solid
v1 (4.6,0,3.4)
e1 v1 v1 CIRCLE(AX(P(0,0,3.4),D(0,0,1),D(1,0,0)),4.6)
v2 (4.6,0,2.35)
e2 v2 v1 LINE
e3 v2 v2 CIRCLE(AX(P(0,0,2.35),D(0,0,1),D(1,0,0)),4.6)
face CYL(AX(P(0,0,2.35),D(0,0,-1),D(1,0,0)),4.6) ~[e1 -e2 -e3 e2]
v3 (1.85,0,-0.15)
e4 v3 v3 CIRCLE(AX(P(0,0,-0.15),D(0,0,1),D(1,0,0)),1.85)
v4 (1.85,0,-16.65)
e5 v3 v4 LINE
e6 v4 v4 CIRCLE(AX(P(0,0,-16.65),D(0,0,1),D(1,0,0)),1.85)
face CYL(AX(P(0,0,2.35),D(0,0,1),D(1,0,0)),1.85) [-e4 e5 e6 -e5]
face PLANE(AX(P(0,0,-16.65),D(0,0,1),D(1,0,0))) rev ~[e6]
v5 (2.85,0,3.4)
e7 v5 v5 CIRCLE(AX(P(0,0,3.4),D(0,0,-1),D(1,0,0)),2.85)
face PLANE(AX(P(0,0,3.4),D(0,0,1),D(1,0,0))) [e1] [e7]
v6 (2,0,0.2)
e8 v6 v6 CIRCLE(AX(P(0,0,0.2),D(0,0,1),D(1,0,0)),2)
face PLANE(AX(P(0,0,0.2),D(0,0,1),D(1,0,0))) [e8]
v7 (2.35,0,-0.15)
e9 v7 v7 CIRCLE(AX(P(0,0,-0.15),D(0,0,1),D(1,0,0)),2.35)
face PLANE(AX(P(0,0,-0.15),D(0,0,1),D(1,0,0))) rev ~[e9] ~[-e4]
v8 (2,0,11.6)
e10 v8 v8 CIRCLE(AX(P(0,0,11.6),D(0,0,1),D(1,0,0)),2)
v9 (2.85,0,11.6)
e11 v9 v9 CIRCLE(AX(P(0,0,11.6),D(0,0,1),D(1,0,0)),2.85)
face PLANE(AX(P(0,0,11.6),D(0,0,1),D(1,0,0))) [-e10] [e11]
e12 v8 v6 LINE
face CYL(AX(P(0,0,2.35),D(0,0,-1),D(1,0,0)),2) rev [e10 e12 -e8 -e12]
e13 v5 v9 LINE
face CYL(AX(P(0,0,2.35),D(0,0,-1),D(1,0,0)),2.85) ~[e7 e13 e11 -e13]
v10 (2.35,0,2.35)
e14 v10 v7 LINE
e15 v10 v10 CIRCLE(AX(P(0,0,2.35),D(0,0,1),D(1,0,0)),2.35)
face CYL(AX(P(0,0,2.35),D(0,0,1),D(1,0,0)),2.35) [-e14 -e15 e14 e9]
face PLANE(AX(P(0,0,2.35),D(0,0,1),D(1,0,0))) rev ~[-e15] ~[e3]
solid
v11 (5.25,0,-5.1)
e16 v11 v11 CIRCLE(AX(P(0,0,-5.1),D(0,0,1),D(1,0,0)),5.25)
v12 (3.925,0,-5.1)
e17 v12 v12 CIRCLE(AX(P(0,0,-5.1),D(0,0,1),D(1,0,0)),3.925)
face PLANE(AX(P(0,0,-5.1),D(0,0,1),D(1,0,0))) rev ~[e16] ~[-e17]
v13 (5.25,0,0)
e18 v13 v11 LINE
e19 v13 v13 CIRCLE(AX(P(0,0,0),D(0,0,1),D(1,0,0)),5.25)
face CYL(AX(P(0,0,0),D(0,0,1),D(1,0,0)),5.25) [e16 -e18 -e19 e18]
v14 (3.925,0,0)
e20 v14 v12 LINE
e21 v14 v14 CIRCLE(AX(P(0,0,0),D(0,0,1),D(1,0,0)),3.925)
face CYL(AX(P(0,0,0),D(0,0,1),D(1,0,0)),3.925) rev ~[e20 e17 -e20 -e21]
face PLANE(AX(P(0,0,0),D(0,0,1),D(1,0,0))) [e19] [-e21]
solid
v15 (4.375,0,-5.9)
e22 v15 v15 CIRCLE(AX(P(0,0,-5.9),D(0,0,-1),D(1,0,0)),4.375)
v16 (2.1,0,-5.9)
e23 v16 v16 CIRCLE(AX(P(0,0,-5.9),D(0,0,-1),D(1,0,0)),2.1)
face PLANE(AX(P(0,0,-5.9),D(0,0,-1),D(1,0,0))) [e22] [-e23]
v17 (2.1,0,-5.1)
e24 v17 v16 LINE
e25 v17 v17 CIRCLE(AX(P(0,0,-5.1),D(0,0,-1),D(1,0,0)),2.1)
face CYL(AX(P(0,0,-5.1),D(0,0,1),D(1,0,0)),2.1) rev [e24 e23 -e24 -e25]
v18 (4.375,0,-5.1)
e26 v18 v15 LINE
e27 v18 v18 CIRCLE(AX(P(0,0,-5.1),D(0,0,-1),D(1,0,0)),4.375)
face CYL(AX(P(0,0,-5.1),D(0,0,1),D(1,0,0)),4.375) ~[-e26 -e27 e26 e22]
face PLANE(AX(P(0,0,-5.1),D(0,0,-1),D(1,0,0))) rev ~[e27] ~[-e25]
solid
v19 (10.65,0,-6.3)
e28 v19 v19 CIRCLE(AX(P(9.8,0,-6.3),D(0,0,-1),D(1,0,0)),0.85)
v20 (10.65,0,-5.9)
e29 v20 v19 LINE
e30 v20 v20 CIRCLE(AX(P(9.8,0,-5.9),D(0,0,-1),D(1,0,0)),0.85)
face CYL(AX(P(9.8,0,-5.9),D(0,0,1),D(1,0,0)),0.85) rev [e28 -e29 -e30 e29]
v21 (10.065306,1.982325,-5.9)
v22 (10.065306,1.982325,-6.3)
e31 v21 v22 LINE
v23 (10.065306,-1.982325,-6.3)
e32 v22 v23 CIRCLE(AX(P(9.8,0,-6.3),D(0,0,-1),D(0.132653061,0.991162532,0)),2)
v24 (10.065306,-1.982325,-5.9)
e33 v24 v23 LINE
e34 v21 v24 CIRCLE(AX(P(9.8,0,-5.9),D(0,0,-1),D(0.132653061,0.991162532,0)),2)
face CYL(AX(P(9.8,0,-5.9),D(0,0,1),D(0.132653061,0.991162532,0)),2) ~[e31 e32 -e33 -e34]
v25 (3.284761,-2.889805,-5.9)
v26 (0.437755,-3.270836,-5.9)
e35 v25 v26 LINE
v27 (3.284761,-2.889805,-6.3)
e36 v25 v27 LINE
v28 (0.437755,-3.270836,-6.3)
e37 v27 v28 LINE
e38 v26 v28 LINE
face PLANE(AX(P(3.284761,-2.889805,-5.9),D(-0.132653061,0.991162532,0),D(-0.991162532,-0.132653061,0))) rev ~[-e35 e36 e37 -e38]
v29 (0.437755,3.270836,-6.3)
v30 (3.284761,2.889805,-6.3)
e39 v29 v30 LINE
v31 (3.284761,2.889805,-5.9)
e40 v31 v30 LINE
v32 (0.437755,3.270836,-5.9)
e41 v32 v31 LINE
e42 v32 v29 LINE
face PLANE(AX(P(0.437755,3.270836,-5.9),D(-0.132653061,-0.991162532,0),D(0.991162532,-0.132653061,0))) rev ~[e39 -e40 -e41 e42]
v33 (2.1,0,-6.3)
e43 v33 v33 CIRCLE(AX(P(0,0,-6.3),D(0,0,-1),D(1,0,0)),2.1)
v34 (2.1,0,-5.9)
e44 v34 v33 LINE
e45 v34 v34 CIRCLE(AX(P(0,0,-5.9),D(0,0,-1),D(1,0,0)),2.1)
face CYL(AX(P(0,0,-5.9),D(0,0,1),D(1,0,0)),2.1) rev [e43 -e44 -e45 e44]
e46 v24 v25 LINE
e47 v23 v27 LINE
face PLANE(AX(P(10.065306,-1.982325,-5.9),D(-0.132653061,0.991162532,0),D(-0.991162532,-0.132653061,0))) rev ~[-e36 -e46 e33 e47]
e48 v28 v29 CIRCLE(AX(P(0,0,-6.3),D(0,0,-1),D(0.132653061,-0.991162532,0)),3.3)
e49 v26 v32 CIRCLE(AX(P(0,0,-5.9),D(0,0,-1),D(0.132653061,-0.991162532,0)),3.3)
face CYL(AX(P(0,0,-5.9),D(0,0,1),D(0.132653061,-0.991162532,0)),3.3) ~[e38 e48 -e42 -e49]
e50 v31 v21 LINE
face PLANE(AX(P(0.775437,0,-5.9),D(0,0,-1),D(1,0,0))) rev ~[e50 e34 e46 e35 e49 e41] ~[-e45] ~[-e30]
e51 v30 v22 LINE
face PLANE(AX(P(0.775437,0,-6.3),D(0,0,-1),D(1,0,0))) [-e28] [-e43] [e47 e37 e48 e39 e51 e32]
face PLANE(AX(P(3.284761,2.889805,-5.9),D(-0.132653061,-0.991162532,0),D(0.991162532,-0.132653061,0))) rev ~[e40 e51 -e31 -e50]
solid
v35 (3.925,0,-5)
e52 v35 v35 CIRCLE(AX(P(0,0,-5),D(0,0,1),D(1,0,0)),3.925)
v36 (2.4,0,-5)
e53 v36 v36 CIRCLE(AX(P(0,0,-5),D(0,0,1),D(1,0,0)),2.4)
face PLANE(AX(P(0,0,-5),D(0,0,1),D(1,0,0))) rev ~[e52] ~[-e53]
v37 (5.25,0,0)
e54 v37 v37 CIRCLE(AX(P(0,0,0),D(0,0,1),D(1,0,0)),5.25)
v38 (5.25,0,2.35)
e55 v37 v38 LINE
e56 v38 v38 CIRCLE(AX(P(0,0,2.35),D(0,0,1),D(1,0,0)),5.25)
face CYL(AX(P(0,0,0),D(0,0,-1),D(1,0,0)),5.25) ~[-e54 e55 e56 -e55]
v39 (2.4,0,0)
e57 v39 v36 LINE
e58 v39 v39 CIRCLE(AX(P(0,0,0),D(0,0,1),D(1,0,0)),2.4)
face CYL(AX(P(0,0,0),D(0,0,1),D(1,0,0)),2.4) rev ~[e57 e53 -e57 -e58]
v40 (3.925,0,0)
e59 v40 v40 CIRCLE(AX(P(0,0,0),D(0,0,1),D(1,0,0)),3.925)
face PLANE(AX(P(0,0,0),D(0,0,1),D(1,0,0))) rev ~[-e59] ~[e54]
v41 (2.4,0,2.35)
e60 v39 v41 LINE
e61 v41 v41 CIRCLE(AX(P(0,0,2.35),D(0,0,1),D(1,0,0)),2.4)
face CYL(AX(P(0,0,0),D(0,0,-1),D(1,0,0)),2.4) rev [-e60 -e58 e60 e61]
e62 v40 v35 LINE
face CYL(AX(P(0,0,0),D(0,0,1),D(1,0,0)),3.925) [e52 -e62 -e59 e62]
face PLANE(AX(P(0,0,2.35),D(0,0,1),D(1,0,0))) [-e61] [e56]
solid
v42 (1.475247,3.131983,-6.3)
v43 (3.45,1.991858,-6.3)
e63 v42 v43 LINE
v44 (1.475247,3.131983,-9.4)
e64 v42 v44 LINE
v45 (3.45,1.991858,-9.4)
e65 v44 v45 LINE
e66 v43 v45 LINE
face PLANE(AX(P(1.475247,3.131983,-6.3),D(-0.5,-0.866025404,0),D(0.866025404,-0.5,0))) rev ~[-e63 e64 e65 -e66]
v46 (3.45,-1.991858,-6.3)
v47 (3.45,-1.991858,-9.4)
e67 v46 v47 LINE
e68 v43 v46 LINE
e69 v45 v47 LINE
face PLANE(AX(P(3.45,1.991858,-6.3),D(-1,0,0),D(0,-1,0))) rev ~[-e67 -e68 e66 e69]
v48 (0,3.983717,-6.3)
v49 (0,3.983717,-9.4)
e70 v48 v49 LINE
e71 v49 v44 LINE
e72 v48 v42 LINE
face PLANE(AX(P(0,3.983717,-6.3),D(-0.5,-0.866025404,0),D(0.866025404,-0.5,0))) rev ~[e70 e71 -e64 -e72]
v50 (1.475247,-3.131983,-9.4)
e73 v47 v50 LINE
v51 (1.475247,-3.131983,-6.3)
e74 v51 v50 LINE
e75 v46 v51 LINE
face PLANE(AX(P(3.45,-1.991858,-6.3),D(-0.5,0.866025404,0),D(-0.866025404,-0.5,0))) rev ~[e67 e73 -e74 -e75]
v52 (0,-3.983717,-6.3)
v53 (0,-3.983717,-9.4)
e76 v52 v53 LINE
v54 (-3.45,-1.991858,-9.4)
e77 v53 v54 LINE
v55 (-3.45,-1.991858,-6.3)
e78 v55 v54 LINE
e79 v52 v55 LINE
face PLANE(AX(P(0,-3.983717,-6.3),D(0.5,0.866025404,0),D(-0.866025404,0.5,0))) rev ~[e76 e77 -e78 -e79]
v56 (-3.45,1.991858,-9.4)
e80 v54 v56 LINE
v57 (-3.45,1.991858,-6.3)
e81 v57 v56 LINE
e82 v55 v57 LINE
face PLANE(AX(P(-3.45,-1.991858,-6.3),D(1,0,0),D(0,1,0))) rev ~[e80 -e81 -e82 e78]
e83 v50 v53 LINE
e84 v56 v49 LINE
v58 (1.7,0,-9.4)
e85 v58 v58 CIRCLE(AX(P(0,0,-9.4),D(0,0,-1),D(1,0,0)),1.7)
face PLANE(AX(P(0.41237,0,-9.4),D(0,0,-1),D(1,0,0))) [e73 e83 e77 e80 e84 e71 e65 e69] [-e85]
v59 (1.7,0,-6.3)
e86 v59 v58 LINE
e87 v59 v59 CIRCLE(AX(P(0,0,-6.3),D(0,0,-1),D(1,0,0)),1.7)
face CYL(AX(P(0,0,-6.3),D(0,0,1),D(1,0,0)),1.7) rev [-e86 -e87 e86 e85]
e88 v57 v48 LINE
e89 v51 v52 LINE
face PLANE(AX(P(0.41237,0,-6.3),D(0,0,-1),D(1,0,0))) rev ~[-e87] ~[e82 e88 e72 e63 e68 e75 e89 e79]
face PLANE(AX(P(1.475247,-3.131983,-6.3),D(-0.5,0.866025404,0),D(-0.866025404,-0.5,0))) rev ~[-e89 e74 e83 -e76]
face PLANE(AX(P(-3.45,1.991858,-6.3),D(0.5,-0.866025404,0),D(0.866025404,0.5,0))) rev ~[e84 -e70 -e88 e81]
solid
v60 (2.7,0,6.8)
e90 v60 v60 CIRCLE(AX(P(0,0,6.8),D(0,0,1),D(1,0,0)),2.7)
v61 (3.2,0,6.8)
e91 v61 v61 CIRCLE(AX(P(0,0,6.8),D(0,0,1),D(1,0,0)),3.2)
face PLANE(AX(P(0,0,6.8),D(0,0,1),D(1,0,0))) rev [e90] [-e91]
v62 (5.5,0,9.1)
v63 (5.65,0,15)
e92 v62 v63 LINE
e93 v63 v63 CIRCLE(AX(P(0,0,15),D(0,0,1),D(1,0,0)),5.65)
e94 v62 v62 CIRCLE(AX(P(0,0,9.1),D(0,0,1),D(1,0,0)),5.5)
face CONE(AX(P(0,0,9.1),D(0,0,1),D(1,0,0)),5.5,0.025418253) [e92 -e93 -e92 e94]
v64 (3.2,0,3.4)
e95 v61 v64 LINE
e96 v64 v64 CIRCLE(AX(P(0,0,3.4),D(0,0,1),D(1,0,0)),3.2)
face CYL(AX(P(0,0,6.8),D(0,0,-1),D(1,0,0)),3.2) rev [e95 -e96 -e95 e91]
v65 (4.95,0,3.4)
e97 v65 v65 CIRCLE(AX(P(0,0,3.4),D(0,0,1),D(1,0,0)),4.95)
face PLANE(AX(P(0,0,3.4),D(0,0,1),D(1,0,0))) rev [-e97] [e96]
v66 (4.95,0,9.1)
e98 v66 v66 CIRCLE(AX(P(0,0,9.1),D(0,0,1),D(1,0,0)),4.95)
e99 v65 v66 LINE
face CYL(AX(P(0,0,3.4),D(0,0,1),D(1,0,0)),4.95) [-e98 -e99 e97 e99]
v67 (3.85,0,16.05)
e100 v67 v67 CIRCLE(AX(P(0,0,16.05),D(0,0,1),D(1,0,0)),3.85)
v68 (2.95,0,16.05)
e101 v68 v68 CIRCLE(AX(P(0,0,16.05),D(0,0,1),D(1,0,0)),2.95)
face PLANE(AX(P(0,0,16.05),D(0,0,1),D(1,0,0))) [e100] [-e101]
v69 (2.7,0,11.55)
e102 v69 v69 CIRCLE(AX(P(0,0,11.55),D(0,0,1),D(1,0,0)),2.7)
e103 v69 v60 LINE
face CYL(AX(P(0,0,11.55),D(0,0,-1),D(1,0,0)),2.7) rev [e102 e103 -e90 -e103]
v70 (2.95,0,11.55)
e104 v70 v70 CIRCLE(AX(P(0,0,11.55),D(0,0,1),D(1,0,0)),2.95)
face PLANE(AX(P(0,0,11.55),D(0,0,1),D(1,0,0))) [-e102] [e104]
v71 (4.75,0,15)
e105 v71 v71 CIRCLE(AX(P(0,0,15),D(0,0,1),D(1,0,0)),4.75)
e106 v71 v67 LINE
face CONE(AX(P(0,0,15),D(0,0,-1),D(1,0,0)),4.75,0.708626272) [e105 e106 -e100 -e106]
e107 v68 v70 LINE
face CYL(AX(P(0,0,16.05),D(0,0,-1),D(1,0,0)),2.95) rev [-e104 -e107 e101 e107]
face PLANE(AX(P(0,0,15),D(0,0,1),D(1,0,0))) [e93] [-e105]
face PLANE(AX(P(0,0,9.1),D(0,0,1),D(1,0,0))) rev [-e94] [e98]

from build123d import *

# Parameters (mm, degrees)
F0_R      = 5.25
F0_R_2    = 3.925
F0_R_3    = 2.4
F1_DEPTH  = 2.35
F2_DEPTH  = 5
F3_DEPTH  = 5.1
F4_R      = 4.6
F4_R_2    = 2.85
F4_R_3    = 2.4
F4_R_4    = 2.35
F4_R_5    = 2
F5_DEPTH  = 1.05
F6_DEPTH  = 9.25
F4_R_6    = 1.85
F7_DEPTH  = 2.5
F8_DEPTH  = 19
F9_DEPTH  = 2.15
F12_R     = 4.375
F12_R_2   = 3.925
F12_R_3   = 2.1
F13_DEPTH = 0.8
F14_R     = 2.1
F14_R_2   = 0.85
F15_DEPTH = 0.4
F16_R     = 2.1
F16_R_2   = 1.7
F17_DEPTH = 3.1


with BuildPart() as f1:
    # F0 (on Top) → F1 (new body)
    with BuildSketch(Plane.XY):
        Circle(F0_R)
        Circle(F0_R_2, mode=Mode.SUBTRACT)
        Circle(F0_R_2)
        Circle(F0_R_3, mode=Mode.SUBTRACT)
    extrude(amount=F1_DEPTH)

    # F0 (on Top) → F2 (join)
    with BuildSketch(Plane.XY):
        Circle(F0_R_2)
        Circle(F0_R_3, mode=Mode.SUBTRACT)
    extrude(amount=-F2_DEPTH)


with BuildPart() as f3:
    # F0 (on Top) → F3 (new body)
    with BuildSketch(Plane.XY):
        Circle(F0_R)
        Circle(F0_R_2, mode=Mode.SUBTRACT)
    extrude(amount=-F3_DEPTH)


with BuildPart() as f5:
    # F4 (on face) → F5 (new body)
    with BuildSketch(Plane.XY.offset(2.35)):
        Circle(F4_R)
        Circle(F4_R_2, mode=Mode.SUBTRACT)
        Circle(F4_R_2)
        Circle(F4_R_3, mode=Mode.SUBTRACT)
        Circle(F4_R_3)
        Circle(F4_R_4, mode=Mode.SUBTRACT)
        Circle(F4_R_4)
        Circle(F4_R_5, mode=Mode.SUBTRACT)
    extrude(amount=F5_DEPTH)

    # F4 (on face) → F6 (join)
    with BuildSketch(Plane.XY.offset(2.35)):
        Circle(F4_R_2)
        Circle(F4_R_3, mode=Mode.SUBTRACT)
        Circle(F4_R_3)
        Circle(F4_R_4, mode=Mode.SUBTRACT)
        Circle(F4_R_4)
        Circle(F4_R_5, mode=Mode.SUBTRACT)
    extrude(amount=F6_DEPTH)

    # F4 (on face) → F7 (join)
    with BuildSketch(Plane.XY.offset(2.35)):
        Circle(F4_R_4)
        Circle(F4_R_5, mode=Mode.SUBTRACT)
        Circle(F4_R_5)
        Circle(F4_R_6, mode=Mode.SUBTRACT)
    extrude(amount=-F7_DEPTH)

    # F4 (on face) → F8 (join)
    with BuildSketch(Plane.XY.offset(2.35)):
        Circle(F4_R_6)
    extrude(amount=-F8_DEPTH)

    # F4 (on face) → F9 (cut)
    with BuildSketch(Plane.XY.offset(2.35)):
        Circle(F4_R_5)
        Circle(F4_R_6, mode=Mode.SUBTRACT)
        Circle(F4_R_6)
    extrude(amount=-F9_DEPTH, mode=Mode.SUBTRACT)


with BuildPart() as f11:
    # F10 (on Front) → F11 (revolve)
    with BuildSketch(Plane.XZ):
        Polygon((3.85, 16.05), (2.95, 16.05), (2.95, 11.55), (2.7, 11.55), (2.7, 6.8), (3.2, 6.8), (3.2, 3.4), (4.95, 3.4), (4.95, 9.1), (5.5, 9.1), (5.65, 15), (4.75, 15), align=None)
    revolve(axis=Axis((0, 0, 12.6171559095), (0, 0, 1)))


with BuildPart() as f13:
    # F12 (on face) → F13 (new body)
    with BuildSketch(Plane(origin=(0, 0, -5.1), x_dir=(1, 0, 0), z_dir=(0, 0, -1))):
        Circle(F12_R)
        Circle(F12_R_2, mode=Mode.SUBTRACT)
        Circle(F12_R_2)
        Circle(F12_R_3, mode=Mode.SUBTRACT)
    extrude(amount=F13_DEPTH)


with BuildPart() as f15:
    # F14 (on face) → F15 (new body)
    with BuildSketch(Plane(origin=(0, 0, -5.9), x_dir=(1, 0, 0), z_dir=(0, 0, -1))):
        with BuildLine():
            Line((0.437755102, -3.2708363564), (3.2847605668, -2.889805014))
            ThreePointArc((3.2847605668, -2.889805014), (4.0933758977, -1.5443117432), (4.375, 0))
            ThreePointArc((4.375, 0), (4.0933758977, 1.5443117432), (3.2847605668, 2.889805014))
            Line((3.2847605668, 2.889805014), (0.437755102, 3.2708363564))
            ThreePointArc((0.437755102, 3.2708363564), (-3.3, 0), (0.437755102, -3.2708363564))
        make_face()
        Circle(F14_R, mode=Mode.SUBTRACT)
        with BuildLine():
            Line((3.2847605668, -2.889805014), (10.0653061224, -1.9823250645))
            ThreePointArc((10.0653061224, -1.9823250645), (11.8, 0), (10.0653061224, 1.9823250645))
            Line((10.0653061224, 1.9823250645), (3.2847605668, 2.889805014))
            ThreePointArc((3.2847605668, 2.889805014), (4.0933758977, 1.5443117432), (4.375, 0))
            ThreePointArc((4.375, 0), (4.0933758977, -1.5443117432), (3.2847605668, -2.889805014))
        make_face()
        with Locations((9.8, 0)):
            Circle(F14_R_2, mode=Mode.SUBTRACT)
    extrude(amount=F15_DEPTH)


with BuildPart() as f17:
    # F16 (on face) → F17 (new body)
    with BuildSketch(Plane(origin=(0, 0, -6.3), x_dir=(1, 0, 0), z_dir=(0, 0, -1))):
        with BuildLine():
            Line((3.45, 1.9918584287), (1.4752466365, 3.1319828147))
            Line((1.4752466365, 3.1319828147), (0.437755102, 3.2708363564))
            ThreePointArc((0.437755102, 3.2708363564), (-3.3, 0), (0.437755102, -3.2708363564))
            Line((0.437755102, -3.2708363564), (1.4752466365, -3.1319828147))
            Line((1.4752466365, -3.1319828147), (3.45, -1.9918584287))
            Line((3.45, -1.9918584287), (3.45, 1.9918584287))
        make_face()
        Circle(F16_R, mode=Mode.SUBTRACT)
        Circle(F16_R)
        Circle(F16_R_2, mode=Mode.SUBTRACT)
        with BuildLine():
            Line((1.4752466365, 3.1319828147), (0, 3.9837168574))
            Line((0, 3.9837168574), (-3.45, 1.9918584287))
            Line((-3.45, 1.9918584287), (-3.45, -1.9918584287))
            Line((-3.45, -1.9918584287), (0, -3.9837168574))
            Line((0, -3.9837168574), (1.4752466365, -3.1319828147))
            Line((1.4752466365, -3.1319828147), (0.437755102, -3.2708363564))
            ThreePointArc((0.437755102, -3.2708363564), (-3.3, 0), (0.437755102, 3.2708363564))
            Line((0.437755102, 3.2708363564), (1.4752466365, 3.1319828147))
        make_face()
    extrude(amount=F17_DEPTH)


solid = Compound([f1.part, f3.part, f5.part, f11.part, f13.part, f15.part, f17.part])
